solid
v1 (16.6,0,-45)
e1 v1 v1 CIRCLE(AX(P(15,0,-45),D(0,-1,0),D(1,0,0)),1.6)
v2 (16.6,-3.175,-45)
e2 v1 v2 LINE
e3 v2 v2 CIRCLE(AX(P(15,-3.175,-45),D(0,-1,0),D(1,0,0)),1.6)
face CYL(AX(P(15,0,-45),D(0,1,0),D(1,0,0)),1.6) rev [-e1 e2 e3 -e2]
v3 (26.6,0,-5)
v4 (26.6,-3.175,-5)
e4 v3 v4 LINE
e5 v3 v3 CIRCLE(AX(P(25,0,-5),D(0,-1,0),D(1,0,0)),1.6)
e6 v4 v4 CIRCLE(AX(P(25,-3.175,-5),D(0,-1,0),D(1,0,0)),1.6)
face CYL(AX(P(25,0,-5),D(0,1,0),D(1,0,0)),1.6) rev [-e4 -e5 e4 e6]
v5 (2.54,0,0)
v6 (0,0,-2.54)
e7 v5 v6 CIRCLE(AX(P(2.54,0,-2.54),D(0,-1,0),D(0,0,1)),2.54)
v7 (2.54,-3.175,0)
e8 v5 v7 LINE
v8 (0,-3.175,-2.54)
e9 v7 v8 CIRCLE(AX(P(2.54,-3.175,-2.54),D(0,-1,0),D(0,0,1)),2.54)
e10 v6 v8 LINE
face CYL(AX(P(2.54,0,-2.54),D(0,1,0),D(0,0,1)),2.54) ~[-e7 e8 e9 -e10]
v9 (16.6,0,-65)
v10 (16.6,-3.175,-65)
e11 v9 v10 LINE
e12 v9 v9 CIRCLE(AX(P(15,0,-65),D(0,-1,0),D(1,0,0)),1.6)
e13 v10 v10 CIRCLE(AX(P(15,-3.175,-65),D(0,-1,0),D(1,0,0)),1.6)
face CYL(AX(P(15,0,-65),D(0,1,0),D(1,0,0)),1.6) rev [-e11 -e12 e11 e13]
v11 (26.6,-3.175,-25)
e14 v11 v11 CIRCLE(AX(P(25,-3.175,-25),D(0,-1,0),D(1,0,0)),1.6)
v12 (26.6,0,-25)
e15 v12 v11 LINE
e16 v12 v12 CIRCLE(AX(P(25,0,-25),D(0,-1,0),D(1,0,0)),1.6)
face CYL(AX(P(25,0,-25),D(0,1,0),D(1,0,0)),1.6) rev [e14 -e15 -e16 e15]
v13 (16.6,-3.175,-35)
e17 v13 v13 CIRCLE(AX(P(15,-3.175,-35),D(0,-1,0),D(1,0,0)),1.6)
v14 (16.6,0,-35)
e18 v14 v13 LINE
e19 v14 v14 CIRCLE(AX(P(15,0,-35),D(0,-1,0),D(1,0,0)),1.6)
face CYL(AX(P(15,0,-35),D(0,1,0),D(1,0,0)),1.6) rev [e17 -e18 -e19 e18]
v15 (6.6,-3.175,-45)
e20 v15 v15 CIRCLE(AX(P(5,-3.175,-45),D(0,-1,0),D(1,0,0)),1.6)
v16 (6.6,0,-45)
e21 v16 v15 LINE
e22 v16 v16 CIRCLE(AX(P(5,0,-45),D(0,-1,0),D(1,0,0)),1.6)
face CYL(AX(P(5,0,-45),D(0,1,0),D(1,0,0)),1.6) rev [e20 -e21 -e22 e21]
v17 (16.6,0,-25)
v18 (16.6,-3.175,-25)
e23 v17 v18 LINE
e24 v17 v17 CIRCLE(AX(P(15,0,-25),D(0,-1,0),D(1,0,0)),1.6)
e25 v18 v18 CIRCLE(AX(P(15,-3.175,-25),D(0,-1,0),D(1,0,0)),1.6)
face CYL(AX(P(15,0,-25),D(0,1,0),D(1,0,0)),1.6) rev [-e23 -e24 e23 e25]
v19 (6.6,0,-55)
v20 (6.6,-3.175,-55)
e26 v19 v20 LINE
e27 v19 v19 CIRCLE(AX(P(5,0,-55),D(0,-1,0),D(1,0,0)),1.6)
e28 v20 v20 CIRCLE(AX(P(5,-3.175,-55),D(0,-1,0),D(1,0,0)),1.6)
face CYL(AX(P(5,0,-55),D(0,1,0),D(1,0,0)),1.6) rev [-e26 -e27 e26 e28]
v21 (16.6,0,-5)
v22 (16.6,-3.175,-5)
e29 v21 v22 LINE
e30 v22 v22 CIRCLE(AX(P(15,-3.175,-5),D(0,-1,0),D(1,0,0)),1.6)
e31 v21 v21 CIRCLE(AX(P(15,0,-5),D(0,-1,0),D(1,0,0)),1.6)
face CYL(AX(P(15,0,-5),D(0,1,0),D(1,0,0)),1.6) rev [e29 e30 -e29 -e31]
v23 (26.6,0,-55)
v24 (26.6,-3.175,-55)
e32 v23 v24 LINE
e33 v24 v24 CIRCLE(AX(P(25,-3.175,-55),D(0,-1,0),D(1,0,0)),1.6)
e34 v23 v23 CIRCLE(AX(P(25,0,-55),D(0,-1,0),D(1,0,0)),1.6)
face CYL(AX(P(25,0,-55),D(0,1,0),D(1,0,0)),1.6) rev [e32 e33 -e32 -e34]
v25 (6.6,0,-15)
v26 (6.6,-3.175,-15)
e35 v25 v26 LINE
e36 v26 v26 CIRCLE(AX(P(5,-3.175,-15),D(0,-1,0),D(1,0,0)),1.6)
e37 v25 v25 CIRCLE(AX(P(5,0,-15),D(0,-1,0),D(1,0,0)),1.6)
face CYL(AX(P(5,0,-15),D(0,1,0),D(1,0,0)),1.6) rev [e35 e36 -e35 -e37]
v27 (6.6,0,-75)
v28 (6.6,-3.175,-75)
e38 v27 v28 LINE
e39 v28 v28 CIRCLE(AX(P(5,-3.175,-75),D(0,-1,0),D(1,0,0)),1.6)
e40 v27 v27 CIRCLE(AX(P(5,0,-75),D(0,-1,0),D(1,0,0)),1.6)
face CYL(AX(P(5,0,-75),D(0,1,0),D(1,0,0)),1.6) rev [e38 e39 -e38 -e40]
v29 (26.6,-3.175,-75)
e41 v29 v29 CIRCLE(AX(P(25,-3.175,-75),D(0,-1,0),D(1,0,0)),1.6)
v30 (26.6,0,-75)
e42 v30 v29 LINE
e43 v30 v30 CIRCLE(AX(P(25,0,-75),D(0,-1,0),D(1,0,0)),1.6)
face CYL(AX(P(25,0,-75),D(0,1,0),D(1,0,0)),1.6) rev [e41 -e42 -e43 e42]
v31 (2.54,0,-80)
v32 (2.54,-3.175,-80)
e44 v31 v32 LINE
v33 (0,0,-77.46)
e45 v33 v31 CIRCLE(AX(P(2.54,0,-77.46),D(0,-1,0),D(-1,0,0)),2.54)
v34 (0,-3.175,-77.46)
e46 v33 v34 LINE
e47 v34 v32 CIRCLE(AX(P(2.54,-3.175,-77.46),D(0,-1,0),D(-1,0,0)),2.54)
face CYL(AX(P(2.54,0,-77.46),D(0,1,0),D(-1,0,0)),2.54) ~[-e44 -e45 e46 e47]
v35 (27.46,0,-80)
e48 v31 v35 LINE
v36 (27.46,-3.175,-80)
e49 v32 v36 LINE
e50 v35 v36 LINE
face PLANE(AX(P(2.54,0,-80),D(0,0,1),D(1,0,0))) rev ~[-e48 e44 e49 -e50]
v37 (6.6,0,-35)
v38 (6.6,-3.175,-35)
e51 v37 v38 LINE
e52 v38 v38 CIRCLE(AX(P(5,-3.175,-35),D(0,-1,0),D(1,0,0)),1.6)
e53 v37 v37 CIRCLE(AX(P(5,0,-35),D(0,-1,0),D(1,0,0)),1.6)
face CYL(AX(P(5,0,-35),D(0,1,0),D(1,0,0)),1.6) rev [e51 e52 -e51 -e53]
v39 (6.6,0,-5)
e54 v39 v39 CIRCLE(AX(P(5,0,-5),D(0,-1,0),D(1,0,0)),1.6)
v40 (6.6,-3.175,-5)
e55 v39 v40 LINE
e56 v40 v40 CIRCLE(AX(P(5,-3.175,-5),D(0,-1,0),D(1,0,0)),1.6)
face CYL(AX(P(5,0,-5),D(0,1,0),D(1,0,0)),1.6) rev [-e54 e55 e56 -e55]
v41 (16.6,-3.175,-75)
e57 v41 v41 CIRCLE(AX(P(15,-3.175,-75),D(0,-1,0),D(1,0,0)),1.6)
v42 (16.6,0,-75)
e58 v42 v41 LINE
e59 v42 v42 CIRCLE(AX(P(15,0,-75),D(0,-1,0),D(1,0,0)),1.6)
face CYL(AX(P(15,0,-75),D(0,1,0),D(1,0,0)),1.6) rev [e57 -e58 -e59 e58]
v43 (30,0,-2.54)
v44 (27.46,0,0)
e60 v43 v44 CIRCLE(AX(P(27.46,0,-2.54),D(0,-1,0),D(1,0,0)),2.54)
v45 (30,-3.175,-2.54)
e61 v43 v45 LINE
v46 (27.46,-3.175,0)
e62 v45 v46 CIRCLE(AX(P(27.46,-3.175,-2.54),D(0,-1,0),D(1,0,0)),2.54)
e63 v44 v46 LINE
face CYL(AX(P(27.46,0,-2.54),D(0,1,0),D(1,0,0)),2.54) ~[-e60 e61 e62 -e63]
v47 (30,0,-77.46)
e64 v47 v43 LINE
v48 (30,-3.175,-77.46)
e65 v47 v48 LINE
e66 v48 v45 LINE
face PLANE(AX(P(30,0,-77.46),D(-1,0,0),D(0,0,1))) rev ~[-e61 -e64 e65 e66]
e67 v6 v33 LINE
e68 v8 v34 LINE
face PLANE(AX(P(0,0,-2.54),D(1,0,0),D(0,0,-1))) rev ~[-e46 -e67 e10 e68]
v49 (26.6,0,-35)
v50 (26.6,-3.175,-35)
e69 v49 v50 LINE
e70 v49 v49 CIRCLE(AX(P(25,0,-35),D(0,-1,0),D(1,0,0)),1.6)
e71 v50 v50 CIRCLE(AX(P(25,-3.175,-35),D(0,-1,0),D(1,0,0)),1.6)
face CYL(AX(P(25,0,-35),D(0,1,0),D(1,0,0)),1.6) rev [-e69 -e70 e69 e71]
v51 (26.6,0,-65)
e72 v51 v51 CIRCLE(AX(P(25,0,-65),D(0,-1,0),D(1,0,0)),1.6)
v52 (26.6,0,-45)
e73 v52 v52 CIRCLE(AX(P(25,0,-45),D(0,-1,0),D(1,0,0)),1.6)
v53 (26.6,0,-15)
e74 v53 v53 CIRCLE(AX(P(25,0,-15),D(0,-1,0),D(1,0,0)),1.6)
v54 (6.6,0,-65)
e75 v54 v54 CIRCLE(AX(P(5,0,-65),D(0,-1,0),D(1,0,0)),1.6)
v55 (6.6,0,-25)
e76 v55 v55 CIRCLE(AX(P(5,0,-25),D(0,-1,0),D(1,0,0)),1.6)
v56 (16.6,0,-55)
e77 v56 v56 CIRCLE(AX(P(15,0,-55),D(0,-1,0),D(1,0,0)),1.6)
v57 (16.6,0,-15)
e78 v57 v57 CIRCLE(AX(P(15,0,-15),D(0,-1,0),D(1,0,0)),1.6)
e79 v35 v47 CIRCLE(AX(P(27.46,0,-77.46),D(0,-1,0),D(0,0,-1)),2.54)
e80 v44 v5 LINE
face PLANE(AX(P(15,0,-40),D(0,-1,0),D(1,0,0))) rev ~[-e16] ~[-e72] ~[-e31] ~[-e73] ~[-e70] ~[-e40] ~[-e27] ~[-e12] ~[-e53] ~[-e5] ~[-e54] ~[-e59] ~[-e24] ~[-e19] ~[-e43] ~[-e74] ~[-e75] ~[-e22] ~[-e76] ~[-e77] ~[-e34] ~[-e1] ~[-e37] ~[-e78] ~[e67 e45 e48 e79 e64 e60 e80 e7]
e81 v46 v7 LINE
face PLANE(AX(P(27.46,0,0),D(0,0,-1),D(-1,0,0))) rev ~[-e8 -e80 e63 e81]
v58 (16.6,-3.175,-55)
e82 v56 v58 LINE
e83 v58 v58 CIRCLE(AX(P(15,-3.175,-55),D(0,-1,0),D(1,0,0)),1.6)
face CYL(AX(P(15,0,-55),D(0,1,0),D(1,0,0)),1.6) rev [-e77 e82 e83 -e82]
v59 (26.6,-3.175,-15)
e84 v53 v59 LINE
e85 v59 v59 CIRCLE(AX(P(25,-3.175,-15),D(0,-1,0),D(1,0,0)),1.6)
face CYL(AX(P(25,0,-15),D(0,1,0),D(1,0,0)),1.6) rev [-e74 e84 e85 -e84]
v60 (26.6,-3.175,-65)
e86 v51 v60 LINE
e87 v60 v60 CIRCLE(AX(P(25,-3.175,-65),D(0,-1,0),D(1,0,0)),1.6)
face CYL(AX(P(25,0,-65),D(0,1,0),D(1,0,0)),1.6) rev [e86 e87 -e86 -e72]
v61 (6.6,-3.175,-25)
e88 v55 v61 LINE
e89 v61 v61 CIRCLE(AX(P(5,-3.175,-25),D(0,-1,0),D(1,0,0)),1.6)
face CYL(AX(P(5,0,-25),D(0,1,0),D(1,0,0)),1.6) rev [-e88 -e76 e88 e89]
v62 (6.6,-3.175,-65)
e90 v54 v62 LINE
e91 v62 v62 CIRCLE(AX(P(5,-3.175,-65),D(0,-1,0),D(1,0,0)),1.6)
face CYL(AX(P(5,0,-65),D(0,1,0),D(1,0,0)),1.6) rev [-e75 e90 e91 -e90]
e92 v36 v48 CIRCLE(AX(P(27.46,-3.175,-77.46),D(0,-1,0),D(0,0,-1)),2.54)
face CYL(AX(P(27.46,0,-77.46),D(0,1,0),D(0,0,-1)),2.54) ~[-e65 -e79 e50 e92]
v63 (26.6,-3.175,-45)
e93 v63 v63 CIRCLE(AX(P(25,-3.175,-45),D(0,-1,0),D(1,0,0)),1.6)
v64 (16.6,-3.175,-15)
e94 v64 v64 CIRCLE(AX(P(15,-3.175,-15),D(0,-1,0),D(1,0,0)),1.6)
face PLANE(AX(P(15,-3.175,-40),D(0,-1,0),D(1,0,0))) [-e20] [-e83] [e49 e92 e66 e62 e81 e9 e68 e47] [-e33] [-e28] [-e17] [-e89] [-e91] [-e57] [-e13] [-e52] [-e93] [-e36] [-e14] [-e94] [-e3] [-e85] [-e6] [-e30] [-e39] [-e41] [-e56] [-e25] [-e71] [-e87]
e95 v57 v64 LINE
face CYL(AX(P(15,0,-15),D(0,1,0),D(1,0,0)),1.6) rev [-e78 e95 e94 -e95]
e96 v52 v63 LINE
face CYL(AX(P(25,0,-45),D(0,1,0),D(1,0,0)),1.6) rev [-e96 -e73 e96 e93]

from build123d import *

# Parameters (mm, degrees)
F0_R     = 1.6
F1_DEPTH = 3.175


# Not quite as in the source:
# - a length typed as a fraction of an inch, garbled in the dataset ("3 / 203.2 mm" for 3/8 in), is restored


with BuildPart() as f1:
    # F0 (on Front) → F1 (new body)
    with BuildSketch(Plane.XZ):
        with BuildLine():
            Line((27.46, 0), (2.54, 0))
            ThreePointArc((2.54, 0), (0.7439487758, -0.7439487758), (0, -2.54))
            Line((0, -2.54), (0, -77.46))
            ThreePointArc((0, -77.46), (0.7439487758, -79.2560512242), (2.54, -80))
            Line((2.54, -80), (27.46, -80))
            ThreePointArc((27.46, -80), (29.2560512242, -79.2560512242), (30, -77.46))
            Line((30, -77.46), (30, -2.54))
            ThreePointArc((30, -2.54), (29.2560512242, -0.7439487758), (27.46, 0))
        make_face()
        with Locations((5, -75)):
            Circle(F0_R, mode=Mode.SUBTRACT)
        with Locations((5, -65)):
            Circle(F0_R, mode=Mode.SUBTRACT)
        with Locations((15, -75)):
            Circle(F0_R, mode=Mode.SUBTRACT)
        with Locations((15, -65)):
            Circle(F0_R, mode=Mode.SUBTRACT)
        with Locations((5, -55)):
            Circle(F0_R, mode=Mode.SUBTRACT)
        with Locations((5, -45)):
            Circle(F0_R, mode=Mode.SUBTRACT)
        with Locations((15, -55)):
            Circle(F0_R, mode=Mode.SUBTRACT)
        with Locations((15, -45)):
            Circle(F0_R, mode=Mode.SUBTRACT)
        with Locations((25, -75)):
            Circle(F0_R, mode=Mode.SUBTRACT)
        with Locations((25, -65)):
            Circle(F0_R, mode=Mode.SUBTRACT)
        with Locations((25, -55)):
            Circle(F0_R, mode=Mode.SUBTRACT)
        with Locations((25, -45)):
            Circle(F0_R, mode=Mode.SUBTRACT)
        with Locations((5, -35)):
            Circle(F0_R, mode=Mode.SUBTRACT)
        with Locations((5, -25)):
            Circle(F0_R, mode=Mode.SUBTRACT)
        with Locations((15, -35)):
            Circle(F0_R, mode=Mode.SUBTRACT)
        with Locations((15, -25)):
            Circle(F0_R, mode=Mode.SUBTRACT)
        with Locations((5, -15)):
            Circle(F0_R, mode=Mode.SUBTRACT)
        with Locations((5, -5)):
            Circle(F0_R, mode=Mode.SUBTRACT)
        with Locations((15, -15)):
            Circle(F0_R, mode=Mode.SUBTRACT)
        with Locations((15, -5)):
            Circle(F0_R, mode=Mode.SUBTRACT)
        with Locations((25, -35)):
            Circle(F0_R, mode=Mode.SUBTRACT)
        with Locations((25, -25)):
            Circle(F0_R, mode=Mode.SUBTRACT)
        with Locations((25, -15)):
            Circle(F0_R, mode=Mode.SUBTRACT)
        with Locations((25, -5)):
            Circle(F0_R, mode=Mode.SUBTRACT)
    extrude(amount=F1_DEPTH)


solid = f1.part
